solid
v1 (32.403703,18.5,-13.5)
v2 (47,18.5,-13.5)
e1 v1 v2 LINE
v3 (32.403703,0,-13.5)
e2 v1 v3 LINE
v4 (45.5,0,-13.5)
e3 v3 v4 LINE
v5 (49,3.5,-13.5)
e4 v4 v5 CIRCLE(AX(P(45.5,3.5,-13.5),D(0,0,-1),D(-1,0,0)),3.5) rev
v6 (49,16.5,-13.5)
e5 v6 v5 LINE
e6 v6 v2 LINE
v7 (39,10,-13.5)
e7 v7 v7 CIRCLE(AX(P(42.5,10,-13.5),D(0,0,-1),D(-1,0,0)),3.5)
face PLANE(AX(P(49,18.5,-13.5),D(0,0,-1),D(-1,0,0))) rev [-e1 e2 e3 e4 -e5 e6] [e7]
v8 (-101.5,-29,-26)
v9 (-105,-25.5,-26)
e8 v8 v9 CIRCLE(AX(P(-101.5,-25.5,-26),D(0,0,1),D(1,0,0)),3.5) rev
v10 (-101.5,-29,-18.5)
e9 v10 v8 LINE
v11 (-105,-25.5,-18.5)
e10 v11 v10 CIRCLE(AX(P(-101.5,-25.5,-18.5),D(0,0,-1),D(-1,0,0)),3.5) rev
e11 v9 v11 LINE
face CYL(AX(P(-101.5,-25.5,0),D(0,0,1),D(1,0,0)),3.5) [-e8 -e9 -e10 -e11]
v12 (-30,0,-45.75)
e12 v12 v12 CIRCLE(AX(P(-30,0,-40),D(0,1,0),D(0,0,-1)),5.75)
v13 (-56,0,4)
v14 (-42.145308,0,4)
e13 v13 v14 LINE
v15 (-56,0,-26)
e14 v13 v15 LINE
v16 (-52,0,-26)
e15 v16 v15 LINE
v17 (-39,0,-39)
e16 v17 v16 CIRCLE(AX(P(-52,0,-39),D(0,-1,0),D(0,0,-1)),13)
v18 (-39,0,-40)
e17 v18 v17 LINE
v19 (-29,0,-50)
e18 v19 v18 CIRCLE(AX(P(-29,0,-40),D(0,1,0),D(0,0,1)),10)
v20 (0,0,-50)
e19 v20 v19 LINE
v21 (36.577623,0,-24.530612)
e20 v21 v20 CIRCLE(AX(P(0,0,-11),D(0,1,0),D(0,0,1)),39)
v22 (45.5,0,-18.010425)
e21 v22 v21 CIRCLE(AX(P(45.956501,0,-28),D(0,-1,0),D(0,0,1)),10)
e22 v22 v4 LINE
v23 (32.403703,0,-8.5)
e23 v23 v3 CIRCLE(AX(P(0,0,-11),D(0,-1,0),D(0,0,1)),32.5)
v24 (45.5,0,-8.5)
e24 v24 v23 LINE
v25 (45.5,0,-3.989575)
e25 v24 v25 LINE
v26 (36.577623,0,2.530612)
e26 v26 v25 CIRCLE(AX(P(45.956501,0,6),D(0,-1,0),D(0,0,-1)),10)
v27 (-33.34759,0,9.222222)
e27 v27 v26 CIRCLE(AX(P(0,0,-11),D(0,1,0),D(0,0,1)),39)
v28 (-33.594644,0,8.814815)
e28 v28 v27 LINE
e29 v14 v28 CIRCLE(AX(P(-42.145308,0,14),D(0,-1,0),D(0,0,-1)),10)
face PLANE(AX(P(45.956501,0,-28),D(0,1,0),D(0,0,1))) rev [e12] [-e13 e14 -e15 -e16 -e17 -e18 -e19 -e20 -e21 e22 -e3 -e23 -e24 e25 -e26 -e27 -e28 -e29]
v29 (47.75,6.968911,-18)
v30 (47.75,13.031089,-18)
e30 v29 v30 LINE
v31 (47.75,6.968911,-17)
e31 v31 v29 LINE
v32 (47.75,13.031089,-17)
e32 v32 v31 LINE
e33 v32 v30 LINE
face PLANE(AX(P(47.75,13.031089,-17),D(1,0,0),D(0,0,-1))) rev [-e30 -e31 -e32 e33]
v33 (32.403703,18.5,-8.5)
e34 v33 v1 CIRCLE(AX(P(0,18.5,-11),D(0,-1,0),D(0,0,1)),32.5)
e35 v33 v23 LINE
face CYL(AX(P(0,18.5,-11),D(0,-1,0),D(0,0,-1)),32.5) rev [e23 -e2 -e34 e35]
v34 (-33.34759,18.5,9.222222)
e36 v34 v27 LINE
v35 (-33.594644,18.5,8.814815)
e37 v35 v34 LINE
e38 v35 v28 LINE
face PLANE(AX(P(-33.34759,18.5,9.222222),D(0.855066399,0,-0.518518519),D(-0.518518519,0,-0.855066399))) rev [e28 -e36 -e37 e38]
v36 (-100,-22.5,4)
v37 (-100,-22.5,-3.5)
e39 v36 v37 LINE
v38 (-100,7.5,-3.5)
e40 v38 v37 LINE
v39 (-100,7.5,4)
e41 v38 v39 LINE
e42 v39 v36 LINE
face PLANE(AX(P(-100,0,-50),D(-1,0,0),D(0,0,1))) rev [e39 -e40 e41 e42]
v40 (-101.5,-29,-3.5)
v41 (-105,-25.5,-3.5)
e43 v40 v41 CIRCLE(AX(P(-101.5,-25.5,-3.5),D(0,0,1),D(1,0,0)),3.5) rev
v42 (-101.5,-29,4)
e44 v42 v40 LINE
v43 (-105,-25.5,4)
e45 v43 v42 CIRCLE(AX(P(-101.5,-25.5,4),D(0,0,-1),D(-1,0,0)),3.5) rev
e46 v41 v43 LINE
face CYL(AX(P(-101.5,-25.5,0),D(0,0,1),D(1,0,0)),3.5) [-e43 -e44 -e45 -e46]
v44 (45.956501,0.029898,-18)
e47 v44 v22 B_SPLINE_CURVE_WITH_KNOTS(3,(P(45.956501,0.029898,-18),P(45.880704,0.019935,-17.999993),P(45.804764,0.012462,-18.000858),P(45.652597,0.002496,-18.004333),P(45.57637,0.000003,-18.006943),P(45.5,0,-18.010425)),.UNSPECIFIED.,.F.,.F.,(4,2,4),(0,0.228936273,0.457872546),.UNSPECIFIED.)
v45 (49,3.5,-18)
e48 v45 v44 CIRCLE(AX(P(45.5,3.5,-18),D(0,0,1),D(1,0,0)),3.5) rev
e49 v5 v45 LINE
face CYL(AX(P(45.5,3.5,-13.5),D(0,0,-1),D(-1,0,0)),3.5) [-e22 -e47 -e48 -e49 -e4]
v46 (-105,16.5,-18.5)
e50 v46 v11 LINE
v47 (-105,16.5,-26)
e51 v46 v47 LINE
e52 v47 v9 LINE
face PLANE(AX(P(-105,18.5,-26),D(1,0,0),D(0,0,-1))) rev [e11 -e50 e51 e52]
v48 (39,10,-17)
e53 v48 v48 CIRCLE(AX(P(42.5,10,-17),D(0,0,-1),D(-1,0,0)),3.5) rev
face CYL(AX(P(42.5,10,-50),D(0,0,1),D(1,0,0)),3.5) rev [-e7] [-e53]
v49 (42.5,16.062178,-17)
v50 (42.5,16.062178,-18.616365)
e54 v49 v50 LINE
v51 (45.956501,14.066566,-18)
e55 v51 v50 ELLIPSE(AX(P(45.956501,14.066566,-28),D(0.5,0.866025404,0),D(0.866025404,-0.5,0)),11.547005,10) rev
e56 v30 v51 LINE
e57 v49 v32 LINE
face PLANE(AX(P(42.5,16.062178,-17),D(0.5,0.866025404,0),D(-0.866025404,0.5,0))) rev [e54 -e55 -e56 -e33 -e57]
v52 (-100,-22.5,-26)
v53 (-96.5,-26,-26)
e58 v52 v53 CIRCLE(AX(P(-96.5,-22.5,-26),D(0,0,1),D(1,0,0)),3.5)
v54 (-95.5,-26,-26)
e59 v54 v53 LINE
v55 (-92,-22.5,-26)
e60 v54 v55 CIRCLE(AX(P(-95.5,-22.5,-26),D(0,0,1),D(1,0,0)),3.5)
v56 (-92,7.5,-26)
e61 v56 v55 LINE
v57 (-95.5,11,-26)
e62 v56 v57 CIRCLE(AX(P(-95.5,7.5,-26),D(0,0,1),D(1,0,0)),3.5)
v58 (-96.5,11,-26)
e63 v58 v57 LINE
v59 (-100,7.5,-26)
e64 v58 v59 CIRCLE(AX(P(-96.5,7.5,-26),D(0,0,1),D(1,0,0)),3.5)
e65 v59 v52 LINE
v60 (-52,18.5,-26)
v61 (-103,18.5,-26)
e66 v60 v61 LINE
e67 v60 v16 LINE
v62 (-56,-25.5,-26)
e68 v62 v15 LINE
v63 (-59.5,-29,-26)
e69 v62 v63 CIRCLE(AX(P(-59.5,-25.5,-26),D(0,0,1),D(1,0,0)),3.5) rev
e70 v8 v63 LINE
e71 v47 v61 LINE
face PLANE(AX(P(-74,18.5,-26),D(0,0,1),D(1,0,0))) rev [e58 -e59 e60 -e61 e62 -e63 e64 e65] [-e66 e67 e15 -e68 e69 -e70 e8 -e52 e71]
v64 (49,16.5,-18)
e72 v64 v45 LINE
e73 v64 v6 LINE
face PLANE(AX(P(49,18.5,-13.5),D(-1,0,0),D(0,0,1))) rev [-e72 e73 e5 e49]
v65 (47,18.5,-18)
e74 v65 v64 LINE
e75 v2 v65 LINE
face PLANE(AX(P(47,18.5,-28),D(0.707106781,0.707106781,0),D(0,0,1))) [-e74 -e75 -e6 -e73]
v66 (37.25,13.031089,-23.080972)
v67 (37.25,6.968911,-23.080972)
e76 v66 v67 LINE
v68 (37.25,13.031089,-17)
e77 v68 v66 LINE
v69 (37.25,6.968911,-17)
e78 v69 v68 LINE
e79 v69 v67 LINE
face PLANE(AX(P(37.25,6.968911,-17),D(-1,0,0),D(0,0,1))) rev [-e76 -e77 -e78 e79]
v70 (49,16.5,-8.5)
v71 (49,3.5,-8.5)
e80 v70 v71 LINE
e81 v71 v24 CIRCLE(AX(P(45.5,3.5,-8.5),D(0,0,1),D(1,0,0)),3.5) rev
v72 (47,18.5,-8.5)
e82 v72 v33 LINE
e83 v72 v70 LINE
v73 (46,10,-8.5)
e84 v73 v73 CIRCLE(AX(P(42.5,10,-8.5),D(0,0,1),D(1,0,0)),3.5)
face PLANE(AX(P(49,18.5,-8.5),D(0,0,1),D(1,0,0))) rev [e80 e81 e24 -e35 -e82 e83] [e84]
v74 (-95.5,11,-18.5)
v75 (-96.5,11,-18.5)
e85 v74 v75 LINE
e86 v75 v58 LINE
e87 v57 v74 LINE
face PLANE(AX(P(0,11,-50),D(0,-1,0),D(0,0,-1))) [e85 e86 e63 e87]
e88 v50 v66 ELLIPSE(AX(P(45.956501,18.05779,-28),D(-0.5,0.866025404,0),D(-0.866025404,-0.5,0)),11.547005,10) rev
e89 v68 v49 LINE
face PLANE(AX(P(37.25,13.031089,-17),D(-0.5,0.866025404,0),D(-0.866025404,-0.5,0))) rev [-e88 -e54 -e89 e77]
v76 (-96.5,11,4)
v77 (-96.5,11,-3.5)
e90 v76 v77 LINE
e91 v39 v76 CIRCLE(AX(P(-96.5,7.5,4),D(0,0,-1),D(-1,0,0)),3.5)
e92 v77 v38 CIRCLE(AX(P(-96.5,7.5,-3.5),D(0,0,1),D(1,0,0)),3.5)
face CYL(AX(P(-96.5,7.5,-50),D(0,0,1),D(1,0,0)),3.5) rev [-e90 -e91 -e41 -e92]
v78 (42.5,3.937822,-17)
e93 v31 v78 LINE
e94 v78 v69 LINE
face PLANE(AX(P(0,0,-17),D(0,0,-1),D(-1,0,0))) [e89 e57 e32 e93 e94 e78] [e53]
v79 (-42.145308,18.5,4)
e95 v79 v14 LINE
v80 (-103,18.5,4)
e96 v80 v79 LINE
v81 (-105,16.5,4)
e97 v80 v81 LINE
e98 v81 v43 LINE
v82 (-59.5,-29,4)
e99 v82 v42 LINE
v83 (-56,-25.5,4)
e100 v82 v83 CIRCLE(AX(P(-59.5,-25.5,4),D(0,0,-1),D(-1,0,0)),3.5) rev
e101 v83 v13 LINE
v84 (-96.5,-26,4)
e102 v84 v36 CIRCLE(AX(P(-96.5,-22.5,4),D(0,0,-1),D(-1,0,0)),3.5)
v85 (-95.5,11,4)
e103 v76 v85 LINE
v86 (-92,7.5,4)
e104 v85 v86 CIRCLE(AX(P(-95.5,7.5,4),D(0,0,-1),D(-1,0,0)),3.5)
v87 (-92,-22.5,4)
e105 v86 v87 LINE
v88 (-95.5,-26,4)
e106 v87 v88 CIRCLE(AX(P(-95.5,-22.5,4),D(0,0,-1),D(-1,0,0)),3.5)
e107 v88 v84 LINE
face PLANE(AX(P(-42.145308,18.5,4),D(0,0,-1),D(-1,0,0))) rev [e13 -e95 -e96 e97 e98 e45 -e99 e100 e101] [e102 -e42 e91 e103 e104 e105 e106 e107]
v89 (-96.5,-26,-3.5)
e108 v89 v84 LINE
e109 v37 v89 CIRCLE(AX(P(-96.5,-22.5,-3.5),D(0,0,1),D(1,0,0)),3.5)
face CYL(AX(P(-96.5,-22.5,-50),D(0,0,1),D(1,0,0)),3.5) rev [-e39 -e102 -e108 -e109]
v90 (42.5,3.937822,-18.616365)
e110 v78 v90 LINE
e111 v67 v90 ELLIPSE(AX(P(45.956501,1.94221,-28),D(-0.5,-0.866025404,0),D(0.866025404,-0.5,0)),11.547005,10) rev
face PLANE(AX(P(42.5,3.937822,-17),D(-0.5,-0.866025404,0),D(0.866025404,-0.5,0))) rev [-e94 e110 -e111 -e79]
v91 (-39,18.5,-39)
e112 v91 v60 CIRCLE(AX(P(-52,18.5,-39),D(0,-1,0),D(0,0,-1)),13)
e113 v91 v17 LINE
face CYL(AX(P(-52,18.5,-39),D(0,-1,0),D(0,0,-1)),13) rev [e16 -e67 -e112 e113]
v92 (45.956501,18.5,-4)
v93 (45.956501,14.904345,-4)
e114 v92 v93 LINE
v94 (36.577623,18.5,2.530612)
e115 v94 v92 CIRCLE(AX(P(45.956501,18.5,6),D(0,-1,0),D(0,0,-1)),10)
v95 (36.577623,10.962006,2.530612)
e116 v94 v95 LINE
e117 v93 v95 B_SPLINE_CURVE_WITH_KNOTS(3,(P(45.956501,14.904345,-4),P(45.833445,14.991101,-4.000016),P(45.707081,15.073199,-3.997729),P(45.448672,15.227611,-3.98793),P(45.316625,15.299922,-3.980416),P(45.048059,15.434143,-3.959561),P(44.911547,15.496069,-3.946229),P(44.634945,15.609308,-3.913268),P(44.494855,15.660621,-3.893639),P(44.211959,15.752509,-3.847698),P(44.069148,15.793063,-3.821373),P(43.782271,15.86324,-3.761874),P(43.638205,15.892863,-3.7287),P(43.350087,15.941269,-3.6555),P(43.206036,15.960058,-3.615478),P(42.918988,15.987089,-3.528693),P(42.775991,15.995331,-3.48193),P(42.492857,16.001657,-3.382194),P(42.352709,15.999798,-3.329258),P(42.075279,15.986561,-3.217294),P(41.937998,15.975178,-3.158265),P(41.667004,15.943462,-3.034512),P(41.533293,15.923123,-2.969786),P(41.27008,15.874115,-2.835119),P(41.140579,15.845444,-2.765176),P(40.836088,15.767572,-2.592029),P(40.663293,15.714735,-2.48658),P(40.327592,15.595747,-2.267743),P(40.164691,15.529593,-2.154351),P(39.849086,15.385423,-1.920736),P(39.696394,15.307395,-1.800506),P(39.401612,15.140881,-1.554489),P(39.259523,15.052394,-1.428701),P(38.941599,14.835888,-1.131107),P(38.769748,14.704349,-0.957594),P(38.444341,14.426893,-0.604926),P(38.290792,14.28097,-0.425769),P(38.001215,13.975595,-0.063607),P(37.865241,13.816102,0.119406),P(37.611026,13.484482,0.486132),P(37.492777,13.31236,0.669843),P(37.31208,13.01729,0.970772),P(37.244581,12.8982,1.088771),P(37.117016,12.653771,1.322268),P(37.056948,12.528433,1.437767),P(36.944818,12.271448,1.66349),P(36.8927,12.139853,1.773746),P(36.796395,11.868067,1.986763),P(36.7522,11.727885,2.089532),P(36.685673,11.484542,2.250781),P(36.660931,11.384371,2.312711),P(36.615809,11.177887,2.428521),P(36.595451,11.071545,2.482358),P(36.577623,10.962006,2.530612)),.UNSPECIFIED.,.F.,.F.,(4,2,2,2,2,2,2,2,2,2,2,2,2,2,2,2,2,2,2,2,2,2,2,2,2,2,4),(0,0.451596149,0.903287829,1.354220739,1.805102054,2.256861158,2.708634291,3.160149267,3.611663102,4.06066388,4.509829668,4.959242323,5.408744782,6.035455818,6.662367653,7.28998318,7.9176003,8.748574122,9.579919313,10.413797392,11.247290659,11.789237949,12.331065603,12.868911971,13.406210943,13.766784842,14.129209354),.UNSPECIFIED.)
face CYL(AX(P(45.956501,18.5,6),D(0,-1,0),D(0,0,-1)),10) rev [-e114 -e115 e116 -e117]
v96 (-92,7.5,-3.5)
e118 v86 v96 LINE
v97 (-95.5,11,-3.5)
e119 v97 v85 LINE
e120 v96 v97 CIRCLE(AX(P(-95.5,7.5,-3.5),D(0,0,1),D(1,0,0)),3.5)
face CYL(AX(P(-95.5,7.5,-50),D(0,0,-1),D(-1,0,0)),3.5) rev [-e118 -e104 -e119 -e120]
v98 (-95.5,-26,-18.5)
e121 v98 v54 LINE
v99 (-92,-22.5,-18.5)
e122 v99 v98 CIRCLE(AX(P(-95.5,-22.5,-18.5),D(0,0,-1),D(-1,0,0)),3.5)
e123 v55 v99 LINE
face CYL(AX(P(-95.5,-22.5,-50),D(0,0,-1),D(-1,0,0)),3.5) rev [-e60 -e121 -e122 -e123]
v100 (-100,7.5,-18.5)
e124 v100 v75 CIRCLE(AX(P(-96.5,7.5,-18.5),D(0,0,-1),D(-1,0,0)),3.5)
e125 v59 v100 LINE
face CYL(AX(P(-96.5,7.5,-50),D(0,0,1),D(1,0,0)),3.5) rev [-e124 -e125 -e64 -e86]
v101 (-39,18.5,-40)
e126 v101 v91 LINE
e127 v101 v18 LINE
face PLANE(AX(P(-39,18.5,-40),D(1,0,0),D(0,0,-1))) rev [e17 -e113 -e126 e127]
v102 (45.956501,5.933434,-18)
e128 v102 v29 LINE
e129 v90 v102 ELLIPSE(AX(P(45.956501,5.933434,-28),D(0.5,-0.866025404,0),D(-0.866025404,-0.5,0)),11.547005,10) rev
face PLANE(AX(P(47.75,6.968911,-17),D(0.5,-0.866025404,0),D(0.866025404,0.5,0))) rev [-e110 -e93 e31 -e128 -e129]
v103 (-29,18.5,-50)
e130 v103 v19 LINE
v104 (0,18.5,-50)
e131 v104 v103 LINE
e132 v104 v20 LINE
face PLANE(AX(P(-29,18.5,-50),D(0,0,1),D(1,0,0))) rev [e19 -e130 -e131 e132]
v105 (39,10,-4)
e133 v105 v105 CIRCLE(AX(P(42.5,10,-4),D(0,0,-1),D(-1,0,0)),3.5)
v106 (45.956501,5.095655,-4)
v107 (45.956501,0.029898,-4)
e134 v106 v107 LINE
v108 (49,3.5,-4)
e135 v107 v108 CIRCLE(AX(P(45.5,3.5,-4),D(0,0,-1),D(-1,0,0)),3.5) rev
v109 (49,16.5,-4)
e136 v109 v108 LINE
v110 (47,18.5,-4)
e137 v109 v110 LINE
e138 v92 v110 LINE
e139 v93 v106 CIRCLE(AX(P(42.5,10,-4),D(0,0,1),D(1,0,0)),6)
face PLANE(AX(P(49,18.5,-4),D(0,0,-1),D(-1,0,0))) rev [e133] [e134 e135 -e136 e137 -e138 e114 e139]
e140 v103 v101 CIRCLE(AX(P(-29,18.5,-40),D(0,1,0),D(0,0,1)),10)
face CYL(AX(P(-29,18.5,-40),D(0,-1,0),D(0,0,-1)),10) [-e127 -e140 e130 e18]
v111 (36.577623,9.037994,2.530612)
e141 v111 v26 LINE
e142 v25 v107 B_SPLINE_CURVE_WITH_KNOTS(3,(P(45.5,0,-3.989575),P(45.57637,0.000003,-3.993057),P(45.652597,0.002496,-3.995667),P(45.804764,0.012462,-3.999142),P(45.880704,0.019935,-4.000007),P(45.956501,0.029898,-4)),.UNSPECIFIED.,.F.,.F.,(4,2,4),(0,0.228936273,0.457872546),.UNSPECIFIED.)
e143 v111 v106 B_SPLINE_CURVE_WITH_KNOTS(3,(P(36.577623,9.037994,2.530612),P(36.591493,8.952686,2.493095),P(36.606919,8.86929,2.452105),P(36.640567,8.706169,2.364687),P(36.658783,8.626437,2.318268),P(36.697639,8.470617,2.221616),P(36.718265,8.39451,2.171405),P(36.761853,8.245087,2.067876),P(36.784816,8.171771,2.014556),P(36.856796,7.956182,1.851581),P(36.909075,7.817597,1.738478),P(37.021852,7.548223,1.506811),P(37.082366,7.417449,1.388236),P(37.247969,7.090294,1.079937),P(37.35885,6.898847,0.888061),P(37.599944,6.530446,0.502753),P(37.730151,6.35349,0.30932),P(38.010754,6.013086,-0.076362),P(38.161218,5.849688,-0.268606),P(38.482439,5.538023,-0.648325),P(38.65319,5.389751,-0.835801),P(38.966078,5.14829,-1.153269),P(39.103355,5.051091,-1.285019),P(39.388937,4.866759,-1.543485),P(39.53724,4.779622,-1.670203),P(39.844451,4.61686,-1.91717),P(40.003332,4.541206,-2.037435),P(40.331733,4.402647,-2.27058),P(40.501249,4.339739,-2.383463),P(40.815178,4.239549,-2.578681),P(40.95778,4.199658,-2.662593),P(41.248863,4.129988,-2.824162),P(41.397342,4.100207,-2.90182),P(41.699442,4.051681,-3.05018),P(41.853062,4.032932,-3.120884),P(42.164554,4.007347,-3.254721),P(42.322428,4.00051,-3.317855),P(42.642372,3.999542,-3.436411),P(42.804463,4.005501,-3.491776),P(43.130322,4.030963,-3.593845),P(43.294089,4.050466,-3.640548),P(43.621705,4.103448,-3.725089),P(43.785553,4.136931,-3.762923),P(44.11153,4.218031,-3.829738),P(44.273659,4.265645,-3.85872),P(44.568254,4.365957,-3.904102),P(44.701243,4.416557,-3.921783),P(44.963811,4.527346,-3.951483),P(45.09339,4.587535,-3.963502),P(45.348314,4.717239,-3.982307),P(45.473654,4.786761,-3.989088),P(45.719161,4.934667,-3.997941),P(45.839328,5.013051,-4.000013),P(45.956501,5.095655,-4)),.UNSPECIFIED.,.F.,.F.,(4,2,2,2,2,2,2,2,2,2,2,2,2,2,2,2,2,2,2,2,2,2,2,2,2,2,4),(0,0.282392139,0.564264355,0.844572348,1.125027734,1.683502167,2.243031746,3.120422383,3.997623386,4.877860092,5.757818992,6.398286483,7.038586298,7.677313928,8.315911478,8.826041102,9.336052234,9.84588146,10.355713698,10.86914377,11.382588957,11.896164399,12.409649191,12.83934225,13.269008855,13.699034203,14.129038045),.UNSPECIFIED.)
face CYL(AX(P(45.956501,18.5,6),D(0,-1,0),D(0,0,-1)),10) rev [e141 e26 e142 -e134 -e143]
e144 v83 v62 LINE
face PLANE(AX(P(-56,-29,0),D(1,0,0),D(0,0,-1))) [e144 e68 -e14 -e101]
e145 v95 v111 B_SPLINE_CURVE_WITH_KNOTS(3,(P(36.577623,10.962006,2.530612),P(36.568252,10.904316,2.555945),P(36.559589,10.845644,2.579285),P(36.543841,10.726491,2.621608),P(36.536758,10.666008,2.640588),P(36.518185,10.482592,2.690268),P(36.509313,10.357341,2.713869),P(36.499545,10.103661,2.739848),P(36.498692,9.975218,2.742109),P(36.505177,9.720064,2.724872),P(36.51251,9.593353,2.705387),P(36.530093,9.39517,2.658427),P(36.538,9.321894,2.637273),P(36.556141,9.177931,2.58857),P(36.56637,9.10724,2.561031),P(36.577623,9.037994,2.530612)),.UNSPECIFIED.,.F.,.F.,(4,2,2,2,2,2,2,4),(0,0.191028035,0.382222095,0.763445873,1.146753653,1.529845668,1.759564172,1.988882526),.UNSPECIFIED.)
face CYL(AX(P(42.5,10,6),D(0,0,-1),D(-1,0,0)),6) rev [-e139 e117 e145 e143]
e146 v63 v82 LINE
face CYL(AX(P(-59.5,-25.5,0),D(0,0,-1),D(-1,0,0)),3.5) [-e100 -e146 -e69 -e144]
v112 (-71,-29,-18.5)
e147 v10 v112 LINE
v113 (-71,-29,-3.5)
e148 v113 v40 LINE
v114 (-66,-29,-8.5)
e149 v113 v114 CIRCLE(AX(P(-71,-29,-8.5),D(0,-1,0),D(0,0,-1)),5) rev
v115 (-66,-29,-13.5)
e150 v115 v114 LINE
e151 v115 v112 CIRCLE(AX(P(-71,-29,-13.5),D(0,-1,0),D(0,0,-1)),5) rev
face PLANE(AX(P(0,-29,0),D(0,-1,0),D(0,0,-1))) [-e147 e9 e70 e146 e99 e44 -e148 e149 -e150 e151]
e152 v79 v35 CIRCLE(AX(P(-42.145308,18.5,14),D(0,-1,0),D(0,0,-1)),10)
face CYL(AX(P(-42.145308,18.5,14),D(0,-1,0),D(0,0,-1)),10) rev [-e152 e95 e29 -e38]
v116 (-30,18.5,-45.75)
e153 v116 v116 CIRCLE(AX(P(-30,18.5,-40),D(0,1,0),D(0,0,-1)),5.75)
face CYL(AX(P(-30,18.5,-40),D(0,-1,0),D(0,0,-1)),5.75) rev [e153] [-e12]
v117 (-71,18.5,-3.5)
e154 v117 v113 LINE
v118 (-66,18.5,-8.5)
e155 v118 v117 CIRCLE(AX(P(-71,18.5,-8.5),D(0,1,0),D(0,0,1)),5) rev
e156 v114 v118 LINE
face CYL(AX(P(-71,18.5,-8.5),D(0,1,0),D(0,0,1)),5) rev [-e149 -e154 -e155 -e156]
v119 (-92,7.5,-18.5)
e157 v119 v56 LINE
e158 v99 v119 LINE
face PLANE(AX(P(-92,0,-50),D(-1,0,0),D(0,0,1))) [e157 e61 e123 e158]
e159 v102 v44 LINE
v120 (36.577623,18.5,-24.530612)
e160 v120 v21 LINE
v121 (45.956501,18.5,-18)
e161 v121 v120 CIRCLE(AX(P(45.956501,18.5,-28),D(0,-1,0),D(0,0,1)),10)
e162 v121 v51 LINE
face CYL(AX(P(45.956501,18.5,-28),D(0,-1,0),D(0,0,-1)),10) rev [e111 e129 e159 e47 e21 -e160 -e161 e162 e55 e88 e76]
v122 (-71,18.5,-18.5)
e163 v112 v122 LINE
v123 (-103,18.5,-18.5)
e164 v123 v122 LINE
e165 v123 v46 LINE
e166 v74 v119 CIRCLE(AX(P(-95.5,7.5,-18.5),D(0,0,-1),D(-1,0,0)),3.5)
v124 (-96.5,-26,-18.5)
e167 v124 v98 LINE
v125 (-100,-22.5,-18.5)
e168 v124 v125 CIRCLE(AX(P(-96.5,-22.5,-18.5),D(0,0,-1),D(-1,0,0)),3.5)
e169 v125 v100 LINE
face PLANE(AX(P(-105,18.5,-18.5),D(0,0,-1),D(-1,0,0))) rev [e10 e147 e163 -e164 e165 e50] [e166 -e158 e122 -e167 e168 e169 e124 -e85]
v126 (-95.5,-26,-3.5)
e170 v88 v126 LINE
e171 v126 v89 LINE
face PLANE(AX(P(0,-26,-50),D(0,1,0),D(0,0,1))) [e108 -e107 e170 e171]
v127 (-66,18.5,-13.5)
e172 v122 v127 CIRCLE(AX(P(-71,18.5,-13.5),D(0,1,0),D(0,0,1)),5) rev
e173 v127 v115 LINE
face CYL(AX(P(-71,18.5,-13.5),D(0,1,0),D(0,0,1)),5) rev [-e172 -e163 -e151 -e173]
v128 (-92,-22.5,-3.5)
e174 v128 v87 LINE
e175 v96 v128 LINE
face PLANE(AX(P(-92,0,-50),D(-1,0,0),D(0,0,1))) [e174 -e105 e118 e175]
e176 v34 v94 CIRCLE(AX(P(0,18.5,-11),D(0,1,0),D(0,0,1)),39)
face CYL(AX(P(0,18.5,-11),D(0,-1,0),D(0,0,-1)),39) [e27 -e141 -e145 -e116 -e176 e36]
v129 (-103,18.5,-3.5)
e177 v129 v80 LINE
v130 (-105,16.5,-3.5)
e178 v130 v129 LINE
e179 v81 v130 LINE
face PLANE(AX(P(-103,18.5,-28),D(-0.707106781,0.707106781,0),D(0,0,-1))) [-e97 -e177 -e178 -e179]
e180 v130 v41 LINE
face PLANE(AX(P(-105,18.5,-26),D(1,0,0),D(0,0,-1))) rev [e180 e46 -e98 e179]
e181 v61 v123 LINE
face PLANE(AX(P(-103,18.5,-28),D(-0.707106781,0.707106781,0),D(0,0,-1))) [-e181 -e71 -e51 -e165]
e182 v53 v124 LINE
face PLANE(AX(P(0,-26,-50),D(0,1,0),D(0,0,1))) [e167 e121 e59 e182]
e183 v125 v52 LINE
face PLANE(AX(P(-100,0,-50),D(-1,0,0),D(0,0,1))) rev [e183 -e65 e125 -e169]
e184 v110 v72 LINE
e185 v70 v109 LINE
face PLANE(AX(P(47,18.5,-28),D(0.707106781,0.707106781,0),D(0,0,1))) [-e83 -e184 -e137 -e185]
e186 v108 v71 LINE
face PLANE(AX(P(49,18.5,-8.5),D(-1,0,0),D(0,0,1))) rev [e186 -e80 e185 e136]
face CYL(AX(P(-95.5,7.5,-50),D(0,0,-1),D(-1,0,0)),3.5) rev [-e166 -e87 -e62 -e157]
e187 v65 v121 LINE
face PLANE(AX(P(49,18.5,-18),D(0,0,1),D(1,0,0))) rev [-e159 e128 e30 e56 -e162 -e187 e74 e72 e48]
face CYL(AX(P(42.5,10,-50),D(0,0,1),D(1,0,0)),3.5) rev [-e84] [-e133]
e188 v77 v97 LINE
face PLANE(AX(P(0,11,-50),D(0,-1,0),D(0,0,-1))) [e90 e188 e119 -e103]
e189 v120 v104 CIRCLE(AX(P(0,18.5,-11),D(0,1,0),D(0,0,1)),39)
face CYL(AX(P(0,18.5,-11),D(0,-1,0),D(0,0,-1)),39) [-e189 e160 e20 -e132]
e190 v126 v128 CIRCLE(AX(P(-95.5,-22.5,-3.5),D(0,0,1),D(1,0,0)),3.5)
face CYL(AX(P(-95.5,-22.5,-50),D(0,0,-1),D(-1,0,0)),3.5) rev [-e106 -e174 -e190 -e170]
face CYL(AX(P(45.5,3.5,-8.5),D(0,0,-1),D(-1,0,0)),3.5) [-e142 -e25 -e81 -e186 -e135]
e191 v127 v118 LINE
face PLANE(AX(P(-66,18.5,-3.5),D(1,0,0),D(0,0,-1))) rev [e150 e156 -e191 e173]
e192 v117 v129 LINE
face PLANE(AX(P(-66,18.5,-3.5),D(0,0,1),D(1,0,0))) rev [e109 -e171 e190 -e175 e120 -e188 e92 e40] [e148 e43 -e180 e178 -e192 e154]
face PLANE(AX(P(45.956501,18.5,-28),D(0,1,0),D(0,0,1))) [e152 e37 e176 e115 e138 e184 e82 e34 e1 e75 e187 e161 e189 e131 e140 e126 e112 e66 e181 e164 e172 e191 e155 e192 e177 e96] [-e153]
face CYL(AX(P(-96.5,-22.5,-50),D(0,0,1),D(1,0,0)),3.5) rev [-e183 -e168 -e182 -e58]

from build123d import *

# Parameters (mm, degrees)
SKETCH1_R               = 5.75
BOSS_EXTRUDE1_DEPTH     = 18.5
BOSS_EXTRUDE2_DEPTH     = 29
CUT_EXTRUDE1_DEPTH      = 126.623445264
CUT_EXTRUDE2_DEPTH      = 122.581248554
FILLET1_R               = 3.5
CHAMFER1_SIZE           = 2
CUT_EXTRUDE3_DEPTH      = 119.245507314
CUT_EXTRUDE3_DEPTH_BACK = 119.245507314
SKETCH7_R               = 3.5
CUT_EXTRUDE4_DEPTH      = 10
CUT_EXTRUDE4_DEPTH_BACK = 1
SKETCH9_R               = 6
CUT_EXTRUDE5_DEPTH      = 10
FILLET3_R               = 3.5
CHAMFER2_SIZE           = 2
FILLET4_R               = 5


with BuildPart() as part:
    # Sketch1 → Boss-Extrude1 (new body)
    with BuildSketch(Plane(origin=(0, 0, 0), x_dir=(1, 0, 0), z_dir=(0, 1, 0))):
        with BuildLine():
            Line((-29, 50), (0, 50))
            ThreePointArc((0, 50), (22.285714286, 43.005420459), (36.577623382, 24.530612245))
            ThreePointArc((36.577623382, 24.530612245), (40.242215458, 19.793481934), (45.956501172, 18))
            Line((45.956501172, 18), (49, 18))
            Line((49, 18), (49, 13.5))
            Line((49, 13.5), (32.403703492, 13.5))
            ThreePointArc((32.403703492, 13.5), (-32.5, 11), (32.403703492, 8.5))
            Line((32.403703492, 8.5), (49, 8.5))
            Line((49, 8.5), (49, 4))
            Line((49, 4), (45.956501172, 4))
            ThreePointArc((45.956501172, 4), (40.242215458, 2.206518066), (36.577623382, -2.530612245))
            ThreePointArc((36.577623382, -2.530612245), (3.715197259, -27.822639134), (-33.347589544, -9.222222222))
            Line((-33.347589544, -9.222222222), (-33.594644376, -8.814814815))
            ThreePointArc((-33.594644376, -8.814814815), (-37.238774547, -5.286451588), (-42.145308361, -4))
            Line((-42.145308361, -4), (-46.173585522, -4))
            Line((-46.173585522, -4), (-74, -4))
            Line((-74, -4), (-105, -4))
            Line((-105, -4), (-105, 26))
            Line((-105, 26), (-74, 26))
            Line((-74, 26), (-52, 26))
            ThreePointArc((-52, 26), (-42.807611845, 29.807611845), (-39, 39))
            Line((-39, 39), (-39, 40))
            ThreePointArc((-39, 40), (-36.071067812, 47.071067812), (-29, 50))
        make_face()
        with Locations(Location((-30, 40, 0), (0, 0, 90))):
            Circle(SKETCH1_R, mode=Mode.SUBTRACT)
    extrude(amount=BOSS_EXTRUDE1_DEPTH)

    # Sketch3 → Boss-Extrude2 (add)
    with BuildSketch(Plane.XZ):
        Polygon((-105, -26), (-56, -26), (-56, -2.142135624), (-56, 4), (-105, 4), align=None)
    extrude(amount=BOSS_EXTRUDE2_DEPTH)

    # Sketch5 → Cut-Extrude1 (cut, through all)
    with BuildSketch(Plane(origin=(0, -29, 0), x_dir=(-1, 0, 0), z_dir=(0, -1, 0))):
        Polygon((66, 3.5), (66, 18.5), (105, 18.5), (105, 11), (105, 3.5), align=None)
    extrude(amount=-CUT_EXTRUDE1_DEPTH, mode=Mode.SUBTRACT)

    # Sketch6 → Cut-Extrude2 (cut, through all)
    with BuildSketch(Plane.XY.offset(4)):
        Polygon((-92, 11), (-100, 11), (-100, -26), (-92, -26), (-92, -5.5), align=None)
    extrude(amount=-CUT_EXTRUDE2_DEPTH, mode=Mode.SUBTRACT)

    # Fillet1
    fillet1_edges = [part.edges().sort_by_distance(p)[0] for p in [
        (-92, 11, -22.25),
        (-92, 11, 0.25),
        (-92, -26, -22.25),
        (-92, -26, 0.25),
        (-100, -26, -22.25),
        (-100, -26, 0.25),
        (-100, 11, -22.25),
        (-100, 11, 0.25),
        (-56, -29, -11),
        (-105, -29, 0.25),
        (-105, -29, -22.25),
    ]]
    fillet(fillet1_edges, radius=FILLET1_R)

    # Chamfer1
    chamfer1_edges = [part.edges().sort_by_distance(p)[0] for p in [
        (-105, 18.5, -22.25),
        (-105, 18.5, 0.25),
    ]]
    chamfer(chamfer1_edges, length=CHAMFER1_SIZE)

    # Sketch7 → Cut-Extrude3 (cut, two sides: drawn at the far end of the back side and taken through both)
    with BuildSketch(Plane.XY.offset(-4).offset(-CUT_EXTRUDE3_DEPTH_BACK)):
        with Locations(Location((42.5, 10, 0), (0, 0, 350.957402384))):
            Circle(SKETCH7_R)
    extrude(amount=CUT_EXTRUDE3_DEPTH + CUT_EXTRUDE3_DEPTH_BACK, mode=Mode.SUBTRACT)

    # Sketch8 → Cut-Extrude4 (cut, two sides: drawn at the far end of the back side and taken through both)
    with BuildSketch(Plane(origin=(0, 0, -18), x_dir=(-1, 0, 0), z_dir=(0, 0, -1)).offset(-CUT_EXTRUDE4_DEPTH_BACK)):
        Polygon((-42.5, 16.062177826), (-47.75, 13.031088913), (-47.75, 6.968911087), (-42.5, 3.937822174), (-37.25, 6.968911087), (-37.25, 13.031088913), align=None)
    extrude(amount=CUT_EXTRUDE4_DEPTH + CUT_EXTRUDE4_DEPTH_BACK, mode=Mode.SUBTRACT)

    # Sketch9 → Cut-Extrude5 (cut)
    with BuildSketch(Plane.XY.offset(-4)):
        with Locations((42.5, 10)):
            Circle(SKETCH9_R)
    extrude(amount=CUT_EXTRUDE5_DEPTH, mode=Mode.SUBTRACT)

    # Fillet3
    # the kernel refuses this fillet: 3.5 mm, written as the material it takes off along each edge
    with BuildSketch(Plane(origin=(49, 0, -26.75), x_dir=(0, 1, 0), z_dir=(0, 0, 1)), Plane(origin=(49, 0, -17.25), x_dir=(0, 1, 0), z_dir=(0, 0, 1))) as fillet3_piece_1:
        with BuildLine():
            CenterArc((FILLET3_R, FILLET3_R), FILLET3_R, 180, 90)
            Line((0, FILLET3_R), (0, 0))
            Line((0, 0), (FILLET3_R, 0))
        make_face()
    extrude(amount=22, mode=Mode.SUBTRACT)

    # Chamfer2
    chamfer2_edges = [part.edges().sort_by_distance(p)[0] for p in [
        (49, 18.5, -6.25),
        (49, 18.5, -15.75),
    ]]
    chamfer(chamfer2_edges, length=CHAMFER2_SIZE)

    # Fillet4
    fillet4_edges = [part.edges().sort_by_distance(p)[0] for p in [
        (-66, -5.25, -18.5),
        (-66, -5.25, -3.5),
    ]]
    fillet(fillet4_edges, radius=FILLET4_R)


solid = part.part
